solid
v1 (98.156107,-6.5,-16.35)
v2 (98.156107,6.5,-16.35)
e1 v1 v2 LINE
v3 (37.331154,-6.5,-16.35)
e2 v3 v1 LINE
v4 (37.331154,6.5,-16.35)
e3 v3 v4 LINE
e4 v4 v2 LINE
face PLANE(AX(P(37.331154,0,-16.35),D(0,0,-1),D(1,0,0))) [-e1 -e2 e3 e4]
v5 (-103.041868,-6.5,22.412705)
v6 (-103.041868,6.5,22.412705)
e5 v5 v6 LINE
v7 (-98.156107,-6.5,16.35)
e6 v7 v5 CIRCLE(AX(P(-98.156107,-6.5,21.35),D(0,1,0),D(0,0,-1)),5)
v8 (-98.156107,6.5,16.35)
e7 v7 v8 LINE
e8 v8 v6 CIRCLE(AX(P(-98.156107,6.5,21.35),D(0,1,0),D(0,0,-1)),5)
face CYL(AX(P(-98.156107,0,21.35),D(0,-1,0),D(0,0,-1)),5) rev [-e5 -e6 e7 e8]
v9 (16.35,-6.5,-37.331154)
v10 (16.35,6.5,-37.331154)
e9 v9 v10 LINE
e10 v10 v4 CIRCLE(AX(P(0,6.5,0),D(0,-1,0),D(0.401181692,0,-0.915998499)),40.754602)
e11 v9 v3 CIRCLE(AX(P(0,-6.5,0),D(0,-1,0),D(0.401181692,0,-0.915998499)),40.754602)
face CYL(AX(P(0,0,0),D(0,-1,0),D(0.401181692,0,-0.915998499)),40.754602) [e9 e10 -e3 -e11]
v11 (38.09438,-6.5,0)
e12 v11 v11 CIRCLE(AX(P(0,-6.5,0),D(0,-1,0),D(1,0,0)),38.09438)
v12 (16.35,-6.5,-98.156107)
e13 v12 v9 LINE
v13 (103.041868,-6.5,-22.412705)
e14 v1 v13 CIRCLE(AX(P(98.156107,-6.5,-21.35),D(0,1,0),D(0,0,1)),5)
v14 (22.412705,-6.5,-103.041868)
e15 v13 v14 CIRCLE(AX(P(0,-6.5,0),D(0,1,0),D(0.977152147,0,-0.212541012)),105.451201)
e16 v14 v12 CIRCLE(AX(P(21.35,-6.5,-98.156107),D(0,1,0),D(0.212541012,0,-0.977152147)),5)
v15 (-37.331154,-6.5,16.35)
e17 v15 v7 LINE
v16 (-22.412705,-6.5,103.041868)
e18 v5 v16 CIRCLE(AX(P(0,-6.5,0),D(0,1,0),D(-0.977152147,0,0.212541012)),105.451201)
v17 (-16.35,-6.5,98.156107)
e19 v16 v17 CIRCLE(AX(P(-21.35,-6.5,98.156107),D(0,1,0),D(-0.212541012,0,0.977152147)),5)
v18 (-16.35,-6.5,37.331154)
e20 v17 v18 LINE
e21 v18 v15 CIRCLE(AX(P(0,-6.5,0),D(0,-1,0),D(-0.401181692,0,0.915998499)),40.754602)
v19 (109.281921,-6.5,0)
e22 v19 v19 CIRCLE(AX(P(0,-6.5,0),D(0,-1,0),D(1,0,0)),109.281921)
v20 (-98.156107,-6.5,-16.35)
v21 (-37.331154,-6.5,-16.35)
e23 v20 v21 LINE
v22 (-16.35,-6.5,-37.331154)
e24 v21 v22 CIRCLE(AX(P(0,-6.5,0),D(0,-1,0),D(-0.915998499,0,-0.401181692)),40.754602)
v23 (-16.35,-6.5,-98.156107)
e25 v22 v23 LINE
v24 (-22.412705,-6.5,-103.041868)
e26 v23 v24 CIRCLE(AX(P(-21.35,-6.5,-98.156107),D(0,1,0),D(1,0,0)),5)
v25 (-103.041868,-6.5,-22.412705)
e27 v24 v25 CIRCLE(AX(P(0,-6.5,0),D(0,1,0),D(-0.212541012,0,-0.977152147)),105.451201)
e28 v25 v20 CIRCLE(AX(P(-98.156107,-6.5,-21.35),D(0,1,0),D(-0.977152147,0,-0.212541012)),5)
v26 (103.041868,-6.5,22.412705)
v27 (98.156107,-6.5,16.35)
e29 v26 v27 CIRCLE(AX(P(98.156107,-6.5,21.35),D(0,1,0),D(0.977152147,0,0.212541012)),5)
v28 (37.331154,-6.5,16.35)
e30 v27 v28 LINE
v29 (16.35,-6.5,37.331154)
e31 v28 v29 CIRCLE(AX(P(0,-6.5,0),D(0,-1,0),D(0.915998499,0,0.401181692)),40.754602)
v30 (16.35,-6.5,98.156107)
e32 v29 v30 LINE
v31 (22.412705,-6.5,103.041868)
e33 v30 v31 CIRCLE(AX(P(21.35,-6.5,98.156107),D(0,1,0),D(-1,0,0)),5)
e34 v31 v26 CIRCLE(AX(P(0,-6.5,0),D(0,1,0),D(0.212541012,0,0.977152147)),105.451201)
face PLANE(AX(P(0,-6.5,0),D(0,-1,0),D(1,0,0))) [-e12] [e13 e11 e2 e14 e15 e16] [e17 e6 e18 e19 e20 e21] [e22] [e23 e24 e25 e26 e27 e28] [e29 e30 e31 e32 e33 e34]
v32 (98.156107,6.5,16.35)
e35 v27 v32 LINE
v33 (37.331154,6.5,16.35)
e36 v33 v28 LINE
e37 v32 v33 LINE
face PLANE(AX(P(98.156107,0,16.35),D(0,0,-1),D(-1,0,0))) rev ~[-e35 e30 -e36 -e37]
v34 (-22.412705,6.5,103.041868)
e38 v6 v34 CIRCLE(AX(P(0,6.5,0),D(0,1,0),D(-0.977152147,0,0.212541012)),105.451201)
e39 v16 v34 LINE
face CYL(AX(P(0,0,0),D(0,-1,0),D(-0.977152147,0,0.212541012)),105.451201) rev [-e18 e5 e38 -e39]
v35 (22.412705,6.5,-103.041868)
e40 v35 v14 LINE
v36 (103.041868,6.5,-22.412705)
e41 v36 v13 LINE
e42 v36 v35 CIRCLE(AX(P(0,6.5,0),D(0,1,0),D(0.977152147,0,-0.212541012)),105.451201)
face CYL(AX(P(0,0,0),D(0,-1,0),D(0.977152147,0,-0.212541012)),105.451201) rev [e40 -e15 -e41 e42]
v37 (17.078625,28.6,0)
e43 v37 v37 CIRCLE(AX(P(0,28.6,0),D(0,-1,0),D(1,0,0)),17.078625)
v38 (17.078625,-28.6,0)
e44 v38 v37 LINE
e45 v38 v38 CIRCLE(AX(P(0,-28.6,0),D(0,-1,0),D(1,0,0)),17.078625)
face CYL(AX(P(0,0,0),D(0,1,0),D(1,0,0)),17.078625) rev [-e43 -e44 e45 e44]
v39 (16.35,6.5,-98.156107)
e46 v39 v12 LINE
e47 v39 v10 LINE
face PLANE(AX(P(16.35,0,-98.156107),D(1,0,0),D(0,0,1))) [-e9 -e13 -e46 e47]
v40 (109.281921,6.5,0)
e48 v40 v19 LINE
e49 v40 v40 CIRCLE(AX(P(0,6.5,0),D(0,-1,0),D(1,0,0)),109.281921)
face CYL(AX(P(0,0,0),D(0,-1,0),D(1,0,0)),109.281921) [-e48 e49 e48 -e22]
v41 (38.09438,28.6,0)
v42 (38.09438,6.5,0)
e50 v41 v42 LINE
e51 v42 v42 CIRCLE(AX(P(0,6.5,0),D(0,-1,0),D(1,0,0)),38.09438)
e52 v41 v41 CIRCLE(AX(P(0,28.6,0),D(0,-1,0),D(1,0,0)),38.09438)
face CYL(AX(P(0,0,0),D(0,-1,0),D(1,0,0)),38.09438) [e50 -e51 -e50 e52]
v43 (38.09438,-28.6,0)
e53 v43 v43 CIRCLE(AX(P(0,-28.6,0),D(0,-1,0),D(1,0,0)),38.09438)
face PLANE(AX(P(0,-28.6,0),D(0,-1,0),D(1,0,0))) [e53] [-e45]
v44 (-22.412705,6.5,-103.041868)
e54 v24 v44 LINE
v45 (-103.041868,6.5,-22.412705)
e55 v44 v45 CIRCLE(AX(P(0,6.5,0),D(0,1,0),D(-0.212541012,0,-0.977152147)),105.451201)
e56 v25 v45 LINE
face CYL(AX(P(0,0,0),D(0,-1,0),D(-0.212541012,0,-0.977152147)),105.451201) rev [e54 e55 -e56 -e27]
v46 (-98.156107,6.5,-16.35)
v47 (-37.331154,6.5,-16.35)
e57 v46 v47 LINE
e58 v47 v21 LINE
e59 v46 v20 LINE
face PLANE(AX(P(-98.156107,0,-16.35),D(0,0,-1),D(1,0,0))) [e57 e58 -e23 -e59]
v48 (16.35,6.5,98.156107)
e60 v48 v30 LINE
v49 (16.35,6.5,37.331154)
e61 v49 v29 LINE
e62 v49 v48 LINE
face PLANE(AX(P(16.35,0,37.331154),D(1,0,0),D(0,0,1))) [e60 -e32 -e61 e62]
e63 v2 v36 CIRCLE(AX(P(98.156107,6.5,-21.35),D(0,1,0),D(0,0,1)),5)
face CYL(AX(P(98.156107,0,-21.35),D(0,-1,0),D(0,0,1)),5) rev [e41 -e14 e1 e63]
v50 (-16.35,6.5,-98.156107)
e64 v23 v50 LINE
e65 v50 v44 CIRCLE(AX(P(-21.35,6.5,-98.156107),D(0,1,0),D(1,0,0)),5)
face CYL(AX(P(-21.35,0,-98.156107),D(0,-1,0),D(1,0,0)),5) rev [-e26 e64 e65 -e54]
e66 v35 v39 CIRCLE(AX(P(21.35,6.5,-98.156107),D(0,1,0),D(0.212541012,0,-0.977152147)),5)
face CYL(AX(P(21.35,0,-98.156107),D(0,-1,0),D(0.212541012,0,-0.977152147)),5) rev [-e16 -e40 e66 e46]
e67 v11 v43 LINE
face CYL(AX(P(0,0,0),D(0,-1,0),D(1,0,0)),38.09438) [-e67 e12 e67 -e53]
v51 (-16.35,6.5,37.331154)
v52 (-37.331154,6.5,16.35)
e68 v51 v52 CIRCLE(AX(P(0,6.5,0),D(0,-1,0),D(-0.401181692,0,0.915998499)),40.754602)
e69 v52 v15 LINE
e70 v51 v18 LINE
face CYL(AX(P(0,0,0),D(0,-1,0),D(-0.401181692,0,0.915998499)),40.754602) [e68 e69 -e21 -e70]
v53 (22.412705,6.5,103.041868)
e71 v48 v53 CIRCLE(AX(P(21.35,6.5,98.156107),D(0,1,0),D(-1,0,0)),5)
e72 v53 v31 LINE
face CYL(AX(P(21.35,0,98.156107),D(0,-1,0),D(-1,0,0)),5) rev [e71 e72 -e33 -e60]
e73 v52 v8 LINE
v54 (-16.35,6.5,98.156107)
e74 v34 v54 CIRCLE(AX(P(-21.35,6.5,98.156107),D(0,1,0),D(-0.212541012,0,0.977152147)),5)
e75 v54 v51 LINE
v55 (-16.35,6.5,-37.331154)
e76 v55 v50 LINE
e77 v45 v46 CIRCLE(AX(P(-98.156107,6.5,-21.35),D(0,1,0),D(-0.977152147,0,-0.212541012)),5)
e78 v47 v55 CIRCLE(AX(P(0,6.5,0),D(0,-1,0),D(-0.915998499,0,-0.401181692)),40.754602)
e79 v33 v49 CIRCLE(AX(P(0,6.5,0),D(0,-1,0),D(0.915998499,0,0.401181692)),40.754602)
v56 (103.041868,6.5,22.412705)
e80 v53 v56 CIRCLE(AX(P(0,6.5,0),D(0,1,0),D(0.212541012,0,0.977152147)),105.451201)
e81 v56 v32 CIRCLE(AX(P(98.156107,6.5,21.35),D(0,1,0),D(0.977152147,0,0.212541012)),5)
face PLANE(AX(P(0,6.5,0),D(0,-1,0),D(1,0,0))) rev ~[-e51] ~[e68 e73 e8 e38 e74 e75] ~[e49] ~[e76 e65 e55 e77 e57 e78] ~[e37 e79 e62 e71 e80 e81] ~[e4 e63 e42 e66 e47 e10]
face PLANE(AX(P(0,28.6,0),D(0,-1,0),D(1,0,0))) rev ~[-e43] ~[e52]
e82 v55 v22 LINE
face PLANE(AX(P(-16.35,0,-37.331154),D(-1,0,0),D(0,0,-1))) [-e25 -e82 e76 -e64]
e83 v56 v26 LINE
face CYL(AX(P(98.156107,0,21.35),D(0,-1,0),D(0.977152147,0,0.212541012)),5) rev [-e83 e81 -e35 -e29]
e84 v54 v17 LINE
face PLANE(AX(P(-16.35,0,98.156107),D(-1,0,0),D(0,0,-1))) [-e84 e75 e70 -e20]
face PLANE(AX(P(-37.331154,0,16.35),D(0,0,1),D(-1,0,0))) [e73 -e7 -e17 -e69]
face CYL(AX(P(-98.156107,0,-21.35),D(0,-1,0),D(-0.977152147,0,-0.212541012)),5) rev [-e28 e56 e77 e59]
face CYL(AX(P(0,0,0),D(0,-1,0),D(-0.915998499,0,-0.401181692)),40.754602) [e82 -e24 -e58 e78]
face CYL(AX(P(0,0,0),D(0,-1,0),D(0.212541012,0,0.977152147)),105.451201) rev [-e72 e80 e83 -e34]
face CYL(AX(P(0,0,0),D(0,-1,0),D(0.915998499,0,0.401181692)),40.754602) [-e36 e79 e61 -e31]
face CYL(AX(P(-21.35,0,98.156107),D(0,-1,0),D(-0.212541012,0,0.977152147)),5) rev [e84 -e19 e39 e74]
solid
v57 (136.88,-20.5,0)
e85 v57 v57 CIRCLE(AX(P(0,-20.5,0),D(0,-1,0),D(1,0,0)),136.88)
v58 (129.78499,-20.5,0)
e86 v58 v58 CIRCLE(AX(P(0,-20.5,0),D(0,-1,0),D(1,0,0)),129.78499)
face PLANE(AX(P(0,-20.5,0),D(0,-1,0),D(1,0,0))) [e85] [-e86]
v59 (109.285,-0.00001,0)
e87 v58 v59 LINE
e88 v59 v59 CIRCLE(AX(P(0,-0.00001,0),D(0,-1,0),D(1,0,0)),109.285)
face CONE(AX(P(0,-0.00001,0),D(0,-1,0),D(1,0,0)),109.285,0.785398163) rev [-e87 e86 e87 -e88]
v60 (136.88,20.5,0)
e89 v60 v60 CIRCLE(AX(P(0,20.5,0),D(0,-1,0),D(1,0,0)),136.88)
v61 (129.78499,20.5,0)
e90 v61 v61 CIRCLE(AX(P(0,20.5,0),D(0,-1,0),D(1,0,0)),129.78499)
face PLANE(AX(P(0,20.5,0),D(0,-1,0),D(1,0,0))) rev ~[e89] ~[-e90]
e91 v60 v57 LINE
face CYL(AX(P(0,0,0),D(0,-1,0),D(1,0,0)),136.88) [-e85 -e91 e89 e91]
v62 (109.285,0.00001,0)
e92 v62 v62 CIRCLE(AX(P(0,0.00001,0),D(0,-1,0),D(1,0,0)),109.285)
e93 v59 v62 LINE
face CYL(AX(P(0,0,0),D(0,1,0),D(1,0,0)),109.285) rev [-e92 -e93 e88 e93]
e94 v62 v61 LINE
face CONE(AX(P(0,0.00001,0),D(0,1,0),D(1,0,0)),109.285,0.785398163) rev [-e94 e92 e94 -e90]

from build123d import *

# Parameters (mm, degrees)
F0_R     = 109.2819211761
F0_R_2   = 38.0943795336
F1_DEPTH = 6.5
F0_R_3   = 17.0786254613
F2_DEPTH = 28.6
F3_R     = 130.7
F3_R_2   = 109.285
F4_DEPTH = 20.5
F5_SIZE  = 20.49999
F3_R_3   = 136.88
F6_DEPTH = 20.5


# Not quite as in the source:
# - a fillet or chamfer is up to 0.001 mm smaller than in the source, because OpenCascade refuses the exact size


with BuildPart() as f1:
    # F0 (on Front) → F1 (new body, symmetric)
    with BuildSketch(Plane.XZ):
        Circle(F0_R)
        with BuildLine():
            Line((-98.1561071561, -16.35), (-37.3311538661, -16.35))
            ThreePointArc((-37.3311538661, -16.35), (-28.8178551334, -28.8178551334), (-16.35, -37.3311538661))
            Line((-16.35, -37.3311538661), (-16.35, -98.1561071561))
            ThreePointArc((-16.35, -98.1561071561), (-18.2126065992, -102.0492758718), (-22.4127050594, -103.0418678908))
            ThreePointArc((-22.4127050594, -103.0418678908), (-74.5652596271, -74.5652596271), (-103.0418678908, -22.4127050594))
            ThreePointArc((-103.0418678908, -22.4127050594), (-102.0492758718, -18.2126065992), (-98.1561071561, -16.35))
        make_face(mode=Mode.SUBTRACT)
        Circle(F0_R_2, mode=Mode.SUBTRACT)
        with BuildLine():
            ThreePointArc((103.0418678908, -22.4127050594), (74.5652596271, -74.5652596271), (22.4127050594, -103.0418678908))
            ThreePointArc((22.4127050594, -103.0418678908), (18.2126065992, -102.0492758718), (16.35, -98.1561071561))
            Line((16.35, -98.1561071561), (16.35, -37.3311538661))
            ThreePointArc((16.35, -37.3311538661), (28.8178551334, -28.8178551334), (37.3311538661, -16.35))
            Line((37.3311538661, -16.35), (98.1561071561, -16.35))
            ThreePointArc((98.1561071561, -16.35), (102.0492758718, -18.2126065992), (103.0418678908, -22.4127050594))
        make_face(mode=Mode.SUBTRACT)
        with BuildLine():
            Line((-16.35, 98.1561071561), (-16.35, 37.3311538661))
            ThreePointArc((-16.35, 37.3311538661), (-28.8178551334, 28.8178551334), (-37.3311538661, 16.35))
            Line((-37.3311538661, 16.35), (-98.1561071561, 16.35))
            ThreePointArc((-98.1561071561, 16.35), (-102.0492758718, 18.2126065992), (-103.0418678908, 22.4127050594))
            ThreePointArc((-103.0418678908, 22.4127050594), (-74.5652596271, 74.5652596271), (-22.4127050594, 103.0418678908))
            ThreePointArc((-22.4127050594, 103.0418678908), (-18.2126065992, 102.0492758718), (-16.35, 98.1561071561))
        make_face(mode=Mode.SUBTRACT)
        with BuildLine():
            Line((98.1561071561, 16.35), (37.3311538661, 16.35))
            ThreePointArc((37.3311538661, 16.35), (28.8178551334, 28.8178551334), (16.35, 37.3311538661))
            Line((16.35, 37.3311538661), (16.35, 98.1561071561))
            ThreePointArc((16.35, 98.1561071561), (18.2126065992, 102.0492758718), (22.4127050594, 103.0418678908))
            ThreePointArc((22.4127050594, 103.0418678908), (74.5652596271, 74.5652596271), (103.0418678908, 22.4127050594))
            ThreePointArc((103.0418678908, 22.4127050594), (102.0492758718, 18.2126065992), (98.1561071561, 16.35))
        make_face(mode=Mode.SUBTRACT)
    extrude(amount=F1_DEPTH, both=True)

    # F0 (on Front) → F2 (join, symmetric)
    with BuildSketch(Plane.XZ):
        Circle(F0_R_2)
        Circle(F0_R_3, mode=Mode.SUBTRACT)
    extrude(amount=F2_DEPTH, both=True)


with BuildPart() as f4:
    # F3 (on face) → F4 (new body, symmetric)
    with BuildSketch(Plane.XZ):
        Circle(F3_R)
        Circle(F3_R_2, mode=Mode.SUBTRACT)
    extrude(amount=F4_DEPTH, both=True)

    # F5 (size 20.5 in the source; OpenCascade refuses exactly that, so slightly less here)
    f5_edges = [f4.edges().sort_by_distance(p)[0] for p in [
        (-109.285, -20.5, 0),
        (109.285, 0, 0),
        (-109.285, 20.5, 0),
    ]]
    chamfer(f5_edges, length=F5_SIZE)

    # F3 (on face) → F6 (join, symmetric)
    with BuildSketch(Plane.XZ):
        Circle(F3_R_3)
        Circle(F3_R, mode=Mode.SUBTRACT)
    extrude(amount=F6_DEPTH, both=True)


solid = Compound([f1.part, f4.part])
